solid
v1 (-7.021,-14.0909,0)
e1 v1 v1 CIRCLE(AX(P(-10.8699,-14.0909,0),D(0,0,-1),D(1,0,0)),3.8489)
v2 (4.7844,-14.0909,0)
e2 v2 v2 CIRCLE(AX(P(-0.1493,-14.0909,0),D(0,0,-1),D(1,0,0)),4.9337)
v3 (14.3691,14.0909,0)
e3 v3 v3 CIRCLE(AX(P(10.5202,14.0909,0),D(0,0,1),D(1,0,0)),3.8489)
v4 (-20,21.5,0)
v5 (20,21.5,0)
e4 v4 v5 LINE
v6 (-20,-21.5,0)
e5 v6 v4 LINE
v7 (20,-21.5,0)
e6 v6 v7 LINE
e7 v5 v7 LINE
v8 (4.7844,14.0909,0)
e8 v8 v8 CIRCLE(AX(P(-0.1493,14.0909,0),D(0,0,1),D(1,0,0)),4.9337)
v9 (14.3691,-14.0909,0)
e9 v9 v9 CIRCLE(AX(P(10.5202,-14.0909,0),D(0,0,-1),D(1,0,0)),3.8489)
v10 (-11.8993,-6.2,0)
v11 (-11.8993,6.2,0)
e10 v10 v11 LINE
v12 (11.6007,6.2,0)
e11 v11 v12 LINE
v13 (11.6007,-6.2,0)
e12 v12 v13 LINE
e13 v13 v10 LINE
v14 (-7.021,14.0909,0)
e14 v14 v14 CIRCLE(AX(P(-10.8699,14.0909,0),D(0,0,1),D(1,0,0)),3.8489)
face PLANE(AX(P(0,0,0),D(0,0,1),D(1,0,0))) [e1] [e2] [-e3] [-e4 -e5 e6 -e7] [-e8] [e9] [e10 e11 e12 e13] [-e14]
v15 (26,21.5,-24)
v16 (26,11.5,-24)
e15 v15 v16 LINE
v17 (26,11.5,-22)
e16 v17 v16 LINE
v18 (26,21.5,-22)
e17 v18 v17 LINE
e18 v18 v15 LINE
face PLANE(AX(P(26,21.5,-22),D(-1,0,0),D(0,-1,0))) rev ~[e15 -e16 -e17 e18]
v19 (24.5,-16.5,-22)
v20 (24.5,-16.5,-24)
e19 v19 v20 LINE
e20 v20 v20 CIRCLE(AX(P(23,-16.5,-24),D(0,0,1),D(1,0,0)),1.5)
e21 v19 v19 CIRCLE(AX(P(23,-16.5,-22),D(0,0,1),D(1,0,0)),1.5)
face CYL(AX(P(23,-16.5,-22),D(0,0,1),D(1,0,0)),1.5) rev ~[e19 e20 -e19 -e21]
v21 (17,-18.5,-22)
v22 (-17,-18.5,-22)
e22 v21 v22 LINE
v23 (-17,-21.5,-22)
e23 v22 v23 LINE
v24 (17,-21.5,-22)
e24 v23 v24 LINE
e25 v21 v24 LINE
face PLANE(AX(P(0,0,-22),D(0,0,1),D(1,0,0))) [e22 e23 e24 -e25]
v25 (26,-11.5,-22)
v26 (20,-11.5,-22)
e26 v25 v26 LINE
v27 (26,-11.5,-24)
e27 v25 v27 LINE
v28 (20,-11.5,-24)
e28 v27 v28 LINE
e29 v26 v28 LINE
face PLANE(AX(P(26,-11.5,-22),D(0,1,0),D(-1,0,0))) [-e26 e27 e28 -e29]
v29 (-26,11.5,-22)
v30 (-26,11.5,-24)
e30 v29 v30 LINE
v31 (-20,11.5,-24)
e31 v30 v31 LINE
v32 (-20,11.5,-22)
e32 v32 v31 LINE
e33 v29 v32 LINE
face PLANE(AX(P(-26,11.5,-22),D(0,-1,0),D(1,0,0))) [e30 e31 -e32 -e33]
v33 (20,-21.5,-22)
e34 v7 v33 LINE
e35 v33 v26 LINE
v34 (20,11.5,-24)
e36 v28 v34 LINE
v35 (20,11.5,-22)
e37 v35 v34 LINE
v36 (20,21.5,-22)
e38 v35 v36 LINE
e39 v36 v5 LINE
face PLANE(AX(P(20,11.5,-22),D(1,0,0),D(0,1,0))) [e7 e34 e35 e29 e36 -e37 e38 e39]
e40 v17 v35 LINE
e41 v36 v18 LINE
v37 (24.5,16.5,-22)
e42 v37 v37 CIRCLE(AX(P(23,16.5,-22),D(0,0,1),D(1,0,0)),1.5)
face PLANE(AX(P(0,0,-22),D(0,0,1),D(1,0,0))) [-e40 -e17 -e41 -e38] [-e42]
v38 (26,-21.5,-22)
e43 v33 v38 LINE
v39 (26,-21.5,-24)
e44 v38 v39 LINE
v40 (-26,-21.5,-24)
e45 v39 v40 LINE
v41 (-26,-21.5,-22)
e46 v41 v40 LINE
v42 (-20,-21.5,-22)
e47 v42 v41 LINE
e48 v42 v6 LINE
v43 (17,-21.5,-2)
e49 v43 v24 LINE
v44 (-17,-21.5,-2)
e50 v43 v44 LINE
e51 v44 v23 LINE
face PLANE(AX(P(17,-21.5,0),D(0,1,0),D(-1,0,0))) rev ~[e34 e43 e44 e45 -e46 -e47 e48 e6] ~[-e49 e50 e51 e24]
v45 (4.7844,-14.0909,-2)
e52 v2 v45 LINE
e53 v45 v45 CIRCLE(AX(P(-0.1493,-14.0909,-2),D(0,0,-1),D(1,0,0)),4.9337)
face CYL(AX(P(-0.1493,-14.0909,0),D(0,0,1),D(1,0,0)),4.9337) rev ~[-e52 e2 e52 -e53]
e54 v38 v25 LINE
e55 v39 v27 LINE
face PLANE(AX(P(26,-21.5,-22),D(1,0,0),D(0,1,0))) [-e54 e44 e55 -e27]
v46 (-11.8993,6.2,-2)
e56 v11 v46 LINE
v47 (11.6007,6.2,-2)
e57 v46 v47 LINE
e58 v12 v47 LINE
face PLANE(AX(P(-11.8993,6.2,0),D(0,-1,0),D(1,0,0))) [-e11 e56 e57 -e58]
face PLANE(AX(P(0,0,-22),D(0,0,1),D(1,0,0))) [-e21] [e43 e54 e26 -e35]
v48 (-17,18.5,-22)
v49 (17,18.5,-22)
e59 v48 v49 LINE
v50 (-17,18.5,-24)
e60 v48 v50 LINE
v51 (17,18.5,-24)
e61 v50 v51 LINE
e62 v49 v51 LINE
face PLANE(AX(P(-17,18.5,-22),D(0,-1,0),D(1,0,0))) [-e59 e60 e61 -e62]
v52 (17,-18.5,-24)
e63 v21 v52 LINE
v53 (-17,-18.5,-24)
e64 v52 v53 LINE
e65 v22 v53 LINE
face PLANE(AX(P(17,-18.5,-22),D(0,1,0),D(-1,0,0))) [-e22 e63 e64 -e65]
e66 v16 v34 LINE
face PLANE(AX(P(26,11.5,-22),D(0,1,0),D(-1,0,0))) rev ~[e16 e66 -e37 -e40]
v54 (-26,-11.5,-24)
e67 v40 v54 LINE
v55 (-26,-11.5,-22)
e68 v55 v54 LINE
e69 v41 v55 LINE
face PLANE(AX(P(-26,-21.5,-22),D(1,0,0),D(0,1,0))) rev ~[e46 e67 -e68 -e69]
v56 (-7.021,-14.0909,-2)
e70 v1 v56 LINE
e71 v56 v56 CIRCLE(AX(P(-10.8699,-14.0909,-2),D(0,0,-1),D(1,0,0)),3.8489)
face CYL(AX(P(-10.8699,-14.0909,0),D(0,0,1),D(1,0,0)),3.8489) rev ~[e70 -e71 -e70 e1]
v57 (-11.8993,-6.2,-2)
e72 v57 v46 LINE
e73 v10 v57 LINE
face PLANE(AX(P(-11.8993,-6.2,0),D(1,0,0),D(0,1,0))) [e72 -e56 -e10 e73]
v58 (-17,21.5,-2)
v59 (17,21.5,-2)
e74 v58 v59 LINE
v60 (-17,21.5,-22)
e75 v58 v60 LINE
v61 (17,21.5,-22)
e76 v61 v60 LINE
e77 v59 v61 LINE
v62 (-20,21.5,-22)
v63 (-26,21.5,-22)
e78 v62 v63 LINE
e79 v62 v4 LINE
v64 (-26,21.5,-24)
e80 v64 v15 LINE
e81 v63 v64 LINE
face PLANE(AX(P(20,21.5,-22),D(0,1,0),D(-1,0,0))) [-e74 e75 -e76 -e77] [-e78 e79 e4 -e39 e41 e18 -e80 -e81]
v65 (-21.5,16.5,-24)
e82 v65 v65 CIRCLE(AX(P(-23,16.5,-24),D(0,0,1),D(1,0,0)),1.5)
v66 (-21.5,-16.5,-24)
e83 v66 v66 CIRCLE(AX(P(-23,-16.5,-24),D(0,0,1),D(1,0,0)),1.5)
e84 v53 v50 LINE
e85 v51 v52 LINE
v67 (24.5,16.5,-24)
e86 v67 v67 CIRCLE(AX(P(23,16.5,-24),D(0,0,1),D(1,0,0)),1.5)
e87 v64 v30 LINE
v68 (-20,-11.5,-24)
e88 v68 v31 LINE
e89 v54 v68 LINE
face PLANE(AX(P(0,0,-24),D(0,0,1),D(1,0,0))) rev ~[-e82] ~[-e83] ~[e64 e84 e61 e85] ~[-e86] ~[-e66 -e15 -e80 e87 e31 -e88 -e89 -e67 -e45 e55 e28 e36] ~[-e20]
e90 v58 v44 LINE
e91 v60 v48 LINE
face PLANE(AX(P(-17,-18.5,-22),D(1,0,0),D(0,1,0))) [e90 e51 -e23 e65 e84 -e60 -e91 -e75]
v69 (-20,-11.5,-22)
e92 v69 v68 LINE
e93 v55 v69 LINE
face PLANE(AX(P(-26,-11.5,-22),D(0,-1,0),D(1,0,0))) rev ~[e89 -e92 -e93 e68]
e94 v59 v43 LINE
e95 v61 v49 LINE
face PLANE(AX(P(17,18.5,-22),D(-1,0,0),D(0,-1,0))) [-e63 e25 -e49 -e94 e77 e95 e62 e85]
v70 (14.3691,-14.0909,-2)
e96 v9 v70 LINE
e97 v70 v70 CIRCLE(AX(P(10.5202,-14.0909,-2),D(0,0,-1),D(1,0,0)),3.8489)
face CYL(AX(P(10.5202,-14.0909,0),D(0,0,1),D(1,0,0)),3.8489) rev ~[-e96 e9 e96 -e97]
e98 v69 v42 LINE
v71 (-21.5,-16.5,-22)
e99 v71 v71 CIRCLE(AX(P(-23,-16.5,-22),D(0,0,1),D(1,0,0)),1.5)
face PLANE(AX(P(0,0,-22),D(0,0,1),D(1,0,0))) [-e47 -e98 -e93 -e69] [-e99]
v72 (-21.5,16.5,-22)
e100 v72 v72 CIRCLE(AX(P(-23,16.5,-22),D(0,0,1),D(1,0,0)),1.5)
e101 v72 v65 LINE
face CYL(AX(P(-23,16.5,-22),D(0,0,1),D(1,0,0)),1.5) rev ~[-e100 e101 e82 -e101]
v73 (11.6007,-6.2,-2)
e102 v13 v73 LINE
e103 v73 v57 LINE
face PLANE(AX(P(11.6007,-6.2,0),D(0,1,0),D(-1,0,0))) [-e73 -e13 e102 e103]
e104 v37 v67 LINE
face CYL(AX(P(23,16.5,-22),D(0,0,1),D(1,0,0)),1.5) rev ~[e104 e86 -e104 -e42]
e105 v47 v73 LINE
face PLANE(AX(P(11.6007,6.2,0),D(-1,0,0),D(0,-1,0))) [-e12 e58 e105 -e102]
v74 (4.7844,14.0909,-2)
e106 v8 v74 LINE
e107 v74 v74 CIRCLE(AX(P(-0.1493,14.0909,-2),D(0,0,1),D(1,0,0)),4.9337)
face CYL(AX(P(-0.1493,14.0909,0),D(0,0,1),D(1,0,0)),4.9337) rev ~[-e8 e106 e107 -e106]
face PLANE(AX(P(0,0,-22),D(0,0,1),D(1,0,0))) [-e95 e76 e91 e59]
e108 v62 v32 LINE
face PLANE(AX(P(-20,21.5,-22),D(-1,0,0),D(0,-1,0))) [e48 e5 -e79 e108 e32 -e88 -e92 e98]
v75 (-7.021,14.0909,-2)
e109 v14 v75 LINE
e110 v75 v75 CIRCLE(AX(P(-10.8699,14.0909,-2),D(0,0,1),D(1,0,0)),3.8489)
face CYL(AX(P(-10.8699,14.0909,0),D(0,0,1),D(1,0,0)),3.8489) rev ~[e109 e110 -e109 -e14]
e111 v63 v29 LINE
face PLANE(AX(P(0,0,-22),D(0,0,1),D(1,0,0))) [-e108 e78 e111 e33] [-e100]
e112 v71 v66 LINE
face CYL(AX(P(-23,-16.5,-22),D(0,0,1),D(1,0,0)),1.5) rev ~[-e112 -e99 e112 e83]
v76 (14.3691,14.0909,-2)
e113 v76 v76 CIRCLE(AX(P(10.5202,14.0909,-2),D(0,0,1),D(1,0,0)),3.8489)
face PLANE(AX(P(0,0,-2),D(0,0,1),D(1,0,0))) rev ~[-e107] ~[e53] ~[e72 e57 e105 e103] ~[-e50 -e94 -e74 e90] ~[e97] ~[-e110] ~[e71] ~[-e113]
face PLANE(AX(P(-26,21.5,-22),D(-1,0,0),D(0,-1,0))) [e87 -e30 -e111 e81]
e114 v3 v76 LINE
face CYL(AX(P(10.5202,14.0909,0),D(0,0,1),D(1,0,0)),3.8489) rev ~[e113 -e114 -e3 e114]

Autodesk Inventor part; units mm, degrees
ref_plane "YZ Plane" through (0, 0, 0) normal (1, 0, 0) x (0, 1, 0)
ref_plane "XZ Plane" through (0, 0, 0) normal (0, 1, 0) x (-1, 0, 0)
sketch "Block1_1" plane through (0, 0, 0) normal (0, 0, 1) x (1, 0, 0)
  circle A0 centre (47.029, 24.2723) radius 1.1
  circle A1 centre (75.029, 24.2723) radius 1.1
  line L0 (49.279, 30.4723) -> (72.779, 30.4723)
  line L1 (72.779, 30.4723) -> (72.779, 18.0723)
  line L2 (72.779, 18.0723) -> (49.279, 18.0723)
  line L3 (49.279, 18.0723) -> (49.279, 30.4723)
  line L4 (49.279, 30.4723) -> (44.779, 30.4723)
  line L5 (44.779, 30.4723) -> (44.779, 18.0723)
  line L6 (44.779, 18.0723) -> (49.279, 18.0723)
  line L7 (49.279, 18.0723) -> (49.279, 30.4723)
  line L8 (72.779, 30.4723) -> (77.279, 30.4723)
  line L9 (77.279, 30.4723) -> (77.279, 18.0723)
  line L10 (77.279, 18.0723) -> (72.779, 18.0723)
  line L11 (72.779, 18.0723) -> (72.779, 30.4723)
  line L12 (44.779, 24.2723) -> (77.279, 24.2723) construction
  line L13 (61.029, 30.4723) -> (61.029, 18.0723) construction
  line L14 (47.029, 30.4723) -> (47.029, 18.0723) construction
  line L15 (75.029, 30.4723) -> (75.029, 18.0723) construction
  line L16 (66.779, 30.4723) -> (66.779, 18.0723) construction
  point P0 (60.979, 24.0984)
  dimension "d2" = 23.5
  dimension "d3" = 12.4
  dimension "d4" = 4.5
  dimension "d5" = 4.5
  dimension "d6" = 2.2
  dimension "d7" = 2.2
  dimension "d8" = 2.25
  dimension "d9" = 6
sketch "Sketch1" plane through (0, 0, 0) normal (0, 0, 1) x (1, 0, 0)
  line L0 (-20, 21.5) -> (20, 21.5)
  line L1 (20, 21.5) -> (20, -21.5)
  line L2 (20, -21.5) -> (-20, -21.5)
  line L3 (-20, -21.5) -> (-20, 21.5)
  line L4 (-0.1493, 33.2365) -> (-0.1493, -35.4112) construction
  line L5 (-27.052, 0) -> (29.4139, 0) construction
  line L6 (20, 21.5) -> (17, 21.5)
  line L7 (17, 21.5) -> (17, -21.5)
  line L8 (17, -21.5) -> (20, -21.5)
  line L9 (20, -21.5) -> (20, 21.5)
  line L10 (-20, 21.5) -> (-17, 21.5)
  line L11 (-17, 21.5) -> (-17, -21.5)
  line L12 (-17, -21.5) -> (-20, -21.5)
  line L13 (-20, -21.5) -> (-20, 21.5)
  line L14 (-20, 21.5) -> (20, 21.5)
  line L15 (20, 21.5) -> (20, -21.5)
  line L16 (20, -21.5) -> (-20, -21.5)
  line L17 (-20, -21.5) -> (-20, 21.5)
  circle A0 centre (-0.1493, 14.0909) radius 4.9337
  circle A1 centre (10.5202, 14.0909) radius 3.8489
  circle A2 centre (-10.8699, 14.0909) radius 3.8489
  circle A3 centre (-14.1493, 0) radius 1.1
  circle A4 centre (13.8507, 0) radius 1.1
  line L18 (-11.8993, 6.2) -> (11.6007, 6.2)
  line L19 (11.6007, 6.2) -> (11.6007, -6.2)
  line L20 (11.6007, -6.2) -> (-11.8993, -6.2)
  line L21 (-11.8993, -6.2) -> (-11.8993, 6.2)
  line L22 (-11.8993, 6.2) -> (-16.3993, 6.2)
  line L23 (-16.3993, 6.2) -> (-16.3993, -6.2)
  line L24 (-16.3993, -6.2) -> (-11.8993, -6.2)
  line L25 (-11.8993, -6.2) -> (-11.8993, 6.2)
  line L26 (11.6007, 6.2) -> (16.1007, 6.2)
  line L27 (16.1007, 6.2) -> (16.1007, -6.2)
  line L28 (16.1007, -6.2) -> (11.6007, -6.2)
  line L29 (11.6007, -6.2) -> (11.6007, 6.2)
  line L30 (-16.3993, 0) -> (16.1007, 0) construction
  line L31 (-0.1493, 6.2) -> (-0.1493, -6.2) construction
  line L32 (-14.1493, 6.2) -> (-14.1493, -6.2) construction
  line L33 (13.8507, 6.2) -> (13.8507, -6.2) construction
  line L34 (5.6007, 6.2) -> (5.6007, -6.2) construction
  point P0 (0, 0)
  point P1 (-20, 0)
  point P2 (0, -21.5)
  dimension "d0" = 40
  dimension "d1" = 43
  dimension "d10" = 3
  dimension "d11" = 3
extrude "Extrusion1" add sketch "Sketch1" against normal blind 2 contours L0 L7 L2 L11 | A0 | A1 | A2 | A3 | A4 | L21 L24 L23 L22 | L26 L27 L28 L19
extrude "Extrusion2" add sketch "Sketch1" against normal blind 22 contours L0 L11 L2 L3 | L0 L1 L2 L7
ref_plane "Work Plane1" through (0, 0, -22) normal (0, 0, 1) x (1, 0, 0)
sketch "Sketch2" plane through (0, 0, -22) normal (0, 0, 1) x (1, 0, 0)
  line L0 (-11.8993, 6.2) -> (11.6007, 6.2) projected
  line L1 (11.6007, -6.2) -> (-11.8993, -6.2) projected
  line L2 (20, 21.5) -> (-20, 21.5) projected
  line L3 (-20, 21.5) -> (-20, -21.5) projected
  line L4 (-20, -21.5) -> (20, -21.5) projected
  line L5 (20, -21.5) -> (20, 21.5) projected
  line L6 (-17, 18.5) -> (17, 18.5)
  line L7 (17, 18.5) -> (17, -18.5)
  line L8 (17, -18.5) -> (-17, -18.5)
  line L9 (-17, -18.5) -> (-17, 18.5)
  line L10 (20, 21.5) -> (26, 21.5)
  line L11 (26, 21.5) -> (26, 11.5)
  line L12 (26, 11.5) -> (20, 11.5)
  line L13 (20, 11.5) -> (20, 21.5)
  line L14 (20, -21.5) -> (26, -21.5)
  line L15 (26, -21.5) -> (26, -11.5)
  line L16 (26, -11.5) -> (20, -11.5)
  line L17 (20, -11.5) -> (20, -21.5)
  line L18 (-20, 21.5) -> (-26, 21.5)
  line L19 (-26, 21.5) -> (-26, 11.5)
  line L20 (-26, 11.5) -> (-20, 11.5)
  line L21 (-20, 11.5) -> (-20, 21.5)
  line L22 (-20, -21.5) -> (-26, -21.5)
  line L23 (-26, -21.5) -> (-26, -11.5)
  line L24 (-26, -11.5) -> (-20, -11.5)
  line L25 (-20, -11.5) -> (-20, -21.5)
  circle A0 centre (-23, 16.5) radius 1.5
  circle A1 centre (-23, -16.5) radius 1.5
  circle A2 centre (23, 16.5) radius 1.5
  circle A3 centre (23, -16.5) radius 1.5
  line L26 (-11.8993, -6.2) -> (-11.8993, 6.2) projected
  line L27 (11.6007, 6.2) -> (11.6007, -6.2) projected
  point P0 (0, 0)
  dimension "d17" = 3
  dimension "d22" = 6
  dimension "d23" = 10
  dimension "d24" = 6
  dimension "d25" = 10
  dimension "d26" = 6
  dimension "d27" = 10
  dimension "d28" = 6
  dimension "d29" = 10
  dimension "d30" = 3
  dimension "d31" = 3
  dimension "d32" = 3
  dimension "d33" = 3
extrude "Extrusion3" add sketch "Sketch2" against normal blind 2 contours L5 L4 L3 L2
extrude "Extrusion4" cut sketch "Sketch1" against normal blind 2 contours A0 | A1 | A2
mirror "Mirror1" about plane through (0, 0, 0) normal (0, 1, 0) of "Extrusion4"
extrude "Extrusion5" add sketch "Sketch2" against normal blind 2 contours L10 L11 L12 L5 | L3 L20 L19 L18 | L16 L15 L14 L5 | L3 L22 L23 L24
properties part number "ServoHolder"
